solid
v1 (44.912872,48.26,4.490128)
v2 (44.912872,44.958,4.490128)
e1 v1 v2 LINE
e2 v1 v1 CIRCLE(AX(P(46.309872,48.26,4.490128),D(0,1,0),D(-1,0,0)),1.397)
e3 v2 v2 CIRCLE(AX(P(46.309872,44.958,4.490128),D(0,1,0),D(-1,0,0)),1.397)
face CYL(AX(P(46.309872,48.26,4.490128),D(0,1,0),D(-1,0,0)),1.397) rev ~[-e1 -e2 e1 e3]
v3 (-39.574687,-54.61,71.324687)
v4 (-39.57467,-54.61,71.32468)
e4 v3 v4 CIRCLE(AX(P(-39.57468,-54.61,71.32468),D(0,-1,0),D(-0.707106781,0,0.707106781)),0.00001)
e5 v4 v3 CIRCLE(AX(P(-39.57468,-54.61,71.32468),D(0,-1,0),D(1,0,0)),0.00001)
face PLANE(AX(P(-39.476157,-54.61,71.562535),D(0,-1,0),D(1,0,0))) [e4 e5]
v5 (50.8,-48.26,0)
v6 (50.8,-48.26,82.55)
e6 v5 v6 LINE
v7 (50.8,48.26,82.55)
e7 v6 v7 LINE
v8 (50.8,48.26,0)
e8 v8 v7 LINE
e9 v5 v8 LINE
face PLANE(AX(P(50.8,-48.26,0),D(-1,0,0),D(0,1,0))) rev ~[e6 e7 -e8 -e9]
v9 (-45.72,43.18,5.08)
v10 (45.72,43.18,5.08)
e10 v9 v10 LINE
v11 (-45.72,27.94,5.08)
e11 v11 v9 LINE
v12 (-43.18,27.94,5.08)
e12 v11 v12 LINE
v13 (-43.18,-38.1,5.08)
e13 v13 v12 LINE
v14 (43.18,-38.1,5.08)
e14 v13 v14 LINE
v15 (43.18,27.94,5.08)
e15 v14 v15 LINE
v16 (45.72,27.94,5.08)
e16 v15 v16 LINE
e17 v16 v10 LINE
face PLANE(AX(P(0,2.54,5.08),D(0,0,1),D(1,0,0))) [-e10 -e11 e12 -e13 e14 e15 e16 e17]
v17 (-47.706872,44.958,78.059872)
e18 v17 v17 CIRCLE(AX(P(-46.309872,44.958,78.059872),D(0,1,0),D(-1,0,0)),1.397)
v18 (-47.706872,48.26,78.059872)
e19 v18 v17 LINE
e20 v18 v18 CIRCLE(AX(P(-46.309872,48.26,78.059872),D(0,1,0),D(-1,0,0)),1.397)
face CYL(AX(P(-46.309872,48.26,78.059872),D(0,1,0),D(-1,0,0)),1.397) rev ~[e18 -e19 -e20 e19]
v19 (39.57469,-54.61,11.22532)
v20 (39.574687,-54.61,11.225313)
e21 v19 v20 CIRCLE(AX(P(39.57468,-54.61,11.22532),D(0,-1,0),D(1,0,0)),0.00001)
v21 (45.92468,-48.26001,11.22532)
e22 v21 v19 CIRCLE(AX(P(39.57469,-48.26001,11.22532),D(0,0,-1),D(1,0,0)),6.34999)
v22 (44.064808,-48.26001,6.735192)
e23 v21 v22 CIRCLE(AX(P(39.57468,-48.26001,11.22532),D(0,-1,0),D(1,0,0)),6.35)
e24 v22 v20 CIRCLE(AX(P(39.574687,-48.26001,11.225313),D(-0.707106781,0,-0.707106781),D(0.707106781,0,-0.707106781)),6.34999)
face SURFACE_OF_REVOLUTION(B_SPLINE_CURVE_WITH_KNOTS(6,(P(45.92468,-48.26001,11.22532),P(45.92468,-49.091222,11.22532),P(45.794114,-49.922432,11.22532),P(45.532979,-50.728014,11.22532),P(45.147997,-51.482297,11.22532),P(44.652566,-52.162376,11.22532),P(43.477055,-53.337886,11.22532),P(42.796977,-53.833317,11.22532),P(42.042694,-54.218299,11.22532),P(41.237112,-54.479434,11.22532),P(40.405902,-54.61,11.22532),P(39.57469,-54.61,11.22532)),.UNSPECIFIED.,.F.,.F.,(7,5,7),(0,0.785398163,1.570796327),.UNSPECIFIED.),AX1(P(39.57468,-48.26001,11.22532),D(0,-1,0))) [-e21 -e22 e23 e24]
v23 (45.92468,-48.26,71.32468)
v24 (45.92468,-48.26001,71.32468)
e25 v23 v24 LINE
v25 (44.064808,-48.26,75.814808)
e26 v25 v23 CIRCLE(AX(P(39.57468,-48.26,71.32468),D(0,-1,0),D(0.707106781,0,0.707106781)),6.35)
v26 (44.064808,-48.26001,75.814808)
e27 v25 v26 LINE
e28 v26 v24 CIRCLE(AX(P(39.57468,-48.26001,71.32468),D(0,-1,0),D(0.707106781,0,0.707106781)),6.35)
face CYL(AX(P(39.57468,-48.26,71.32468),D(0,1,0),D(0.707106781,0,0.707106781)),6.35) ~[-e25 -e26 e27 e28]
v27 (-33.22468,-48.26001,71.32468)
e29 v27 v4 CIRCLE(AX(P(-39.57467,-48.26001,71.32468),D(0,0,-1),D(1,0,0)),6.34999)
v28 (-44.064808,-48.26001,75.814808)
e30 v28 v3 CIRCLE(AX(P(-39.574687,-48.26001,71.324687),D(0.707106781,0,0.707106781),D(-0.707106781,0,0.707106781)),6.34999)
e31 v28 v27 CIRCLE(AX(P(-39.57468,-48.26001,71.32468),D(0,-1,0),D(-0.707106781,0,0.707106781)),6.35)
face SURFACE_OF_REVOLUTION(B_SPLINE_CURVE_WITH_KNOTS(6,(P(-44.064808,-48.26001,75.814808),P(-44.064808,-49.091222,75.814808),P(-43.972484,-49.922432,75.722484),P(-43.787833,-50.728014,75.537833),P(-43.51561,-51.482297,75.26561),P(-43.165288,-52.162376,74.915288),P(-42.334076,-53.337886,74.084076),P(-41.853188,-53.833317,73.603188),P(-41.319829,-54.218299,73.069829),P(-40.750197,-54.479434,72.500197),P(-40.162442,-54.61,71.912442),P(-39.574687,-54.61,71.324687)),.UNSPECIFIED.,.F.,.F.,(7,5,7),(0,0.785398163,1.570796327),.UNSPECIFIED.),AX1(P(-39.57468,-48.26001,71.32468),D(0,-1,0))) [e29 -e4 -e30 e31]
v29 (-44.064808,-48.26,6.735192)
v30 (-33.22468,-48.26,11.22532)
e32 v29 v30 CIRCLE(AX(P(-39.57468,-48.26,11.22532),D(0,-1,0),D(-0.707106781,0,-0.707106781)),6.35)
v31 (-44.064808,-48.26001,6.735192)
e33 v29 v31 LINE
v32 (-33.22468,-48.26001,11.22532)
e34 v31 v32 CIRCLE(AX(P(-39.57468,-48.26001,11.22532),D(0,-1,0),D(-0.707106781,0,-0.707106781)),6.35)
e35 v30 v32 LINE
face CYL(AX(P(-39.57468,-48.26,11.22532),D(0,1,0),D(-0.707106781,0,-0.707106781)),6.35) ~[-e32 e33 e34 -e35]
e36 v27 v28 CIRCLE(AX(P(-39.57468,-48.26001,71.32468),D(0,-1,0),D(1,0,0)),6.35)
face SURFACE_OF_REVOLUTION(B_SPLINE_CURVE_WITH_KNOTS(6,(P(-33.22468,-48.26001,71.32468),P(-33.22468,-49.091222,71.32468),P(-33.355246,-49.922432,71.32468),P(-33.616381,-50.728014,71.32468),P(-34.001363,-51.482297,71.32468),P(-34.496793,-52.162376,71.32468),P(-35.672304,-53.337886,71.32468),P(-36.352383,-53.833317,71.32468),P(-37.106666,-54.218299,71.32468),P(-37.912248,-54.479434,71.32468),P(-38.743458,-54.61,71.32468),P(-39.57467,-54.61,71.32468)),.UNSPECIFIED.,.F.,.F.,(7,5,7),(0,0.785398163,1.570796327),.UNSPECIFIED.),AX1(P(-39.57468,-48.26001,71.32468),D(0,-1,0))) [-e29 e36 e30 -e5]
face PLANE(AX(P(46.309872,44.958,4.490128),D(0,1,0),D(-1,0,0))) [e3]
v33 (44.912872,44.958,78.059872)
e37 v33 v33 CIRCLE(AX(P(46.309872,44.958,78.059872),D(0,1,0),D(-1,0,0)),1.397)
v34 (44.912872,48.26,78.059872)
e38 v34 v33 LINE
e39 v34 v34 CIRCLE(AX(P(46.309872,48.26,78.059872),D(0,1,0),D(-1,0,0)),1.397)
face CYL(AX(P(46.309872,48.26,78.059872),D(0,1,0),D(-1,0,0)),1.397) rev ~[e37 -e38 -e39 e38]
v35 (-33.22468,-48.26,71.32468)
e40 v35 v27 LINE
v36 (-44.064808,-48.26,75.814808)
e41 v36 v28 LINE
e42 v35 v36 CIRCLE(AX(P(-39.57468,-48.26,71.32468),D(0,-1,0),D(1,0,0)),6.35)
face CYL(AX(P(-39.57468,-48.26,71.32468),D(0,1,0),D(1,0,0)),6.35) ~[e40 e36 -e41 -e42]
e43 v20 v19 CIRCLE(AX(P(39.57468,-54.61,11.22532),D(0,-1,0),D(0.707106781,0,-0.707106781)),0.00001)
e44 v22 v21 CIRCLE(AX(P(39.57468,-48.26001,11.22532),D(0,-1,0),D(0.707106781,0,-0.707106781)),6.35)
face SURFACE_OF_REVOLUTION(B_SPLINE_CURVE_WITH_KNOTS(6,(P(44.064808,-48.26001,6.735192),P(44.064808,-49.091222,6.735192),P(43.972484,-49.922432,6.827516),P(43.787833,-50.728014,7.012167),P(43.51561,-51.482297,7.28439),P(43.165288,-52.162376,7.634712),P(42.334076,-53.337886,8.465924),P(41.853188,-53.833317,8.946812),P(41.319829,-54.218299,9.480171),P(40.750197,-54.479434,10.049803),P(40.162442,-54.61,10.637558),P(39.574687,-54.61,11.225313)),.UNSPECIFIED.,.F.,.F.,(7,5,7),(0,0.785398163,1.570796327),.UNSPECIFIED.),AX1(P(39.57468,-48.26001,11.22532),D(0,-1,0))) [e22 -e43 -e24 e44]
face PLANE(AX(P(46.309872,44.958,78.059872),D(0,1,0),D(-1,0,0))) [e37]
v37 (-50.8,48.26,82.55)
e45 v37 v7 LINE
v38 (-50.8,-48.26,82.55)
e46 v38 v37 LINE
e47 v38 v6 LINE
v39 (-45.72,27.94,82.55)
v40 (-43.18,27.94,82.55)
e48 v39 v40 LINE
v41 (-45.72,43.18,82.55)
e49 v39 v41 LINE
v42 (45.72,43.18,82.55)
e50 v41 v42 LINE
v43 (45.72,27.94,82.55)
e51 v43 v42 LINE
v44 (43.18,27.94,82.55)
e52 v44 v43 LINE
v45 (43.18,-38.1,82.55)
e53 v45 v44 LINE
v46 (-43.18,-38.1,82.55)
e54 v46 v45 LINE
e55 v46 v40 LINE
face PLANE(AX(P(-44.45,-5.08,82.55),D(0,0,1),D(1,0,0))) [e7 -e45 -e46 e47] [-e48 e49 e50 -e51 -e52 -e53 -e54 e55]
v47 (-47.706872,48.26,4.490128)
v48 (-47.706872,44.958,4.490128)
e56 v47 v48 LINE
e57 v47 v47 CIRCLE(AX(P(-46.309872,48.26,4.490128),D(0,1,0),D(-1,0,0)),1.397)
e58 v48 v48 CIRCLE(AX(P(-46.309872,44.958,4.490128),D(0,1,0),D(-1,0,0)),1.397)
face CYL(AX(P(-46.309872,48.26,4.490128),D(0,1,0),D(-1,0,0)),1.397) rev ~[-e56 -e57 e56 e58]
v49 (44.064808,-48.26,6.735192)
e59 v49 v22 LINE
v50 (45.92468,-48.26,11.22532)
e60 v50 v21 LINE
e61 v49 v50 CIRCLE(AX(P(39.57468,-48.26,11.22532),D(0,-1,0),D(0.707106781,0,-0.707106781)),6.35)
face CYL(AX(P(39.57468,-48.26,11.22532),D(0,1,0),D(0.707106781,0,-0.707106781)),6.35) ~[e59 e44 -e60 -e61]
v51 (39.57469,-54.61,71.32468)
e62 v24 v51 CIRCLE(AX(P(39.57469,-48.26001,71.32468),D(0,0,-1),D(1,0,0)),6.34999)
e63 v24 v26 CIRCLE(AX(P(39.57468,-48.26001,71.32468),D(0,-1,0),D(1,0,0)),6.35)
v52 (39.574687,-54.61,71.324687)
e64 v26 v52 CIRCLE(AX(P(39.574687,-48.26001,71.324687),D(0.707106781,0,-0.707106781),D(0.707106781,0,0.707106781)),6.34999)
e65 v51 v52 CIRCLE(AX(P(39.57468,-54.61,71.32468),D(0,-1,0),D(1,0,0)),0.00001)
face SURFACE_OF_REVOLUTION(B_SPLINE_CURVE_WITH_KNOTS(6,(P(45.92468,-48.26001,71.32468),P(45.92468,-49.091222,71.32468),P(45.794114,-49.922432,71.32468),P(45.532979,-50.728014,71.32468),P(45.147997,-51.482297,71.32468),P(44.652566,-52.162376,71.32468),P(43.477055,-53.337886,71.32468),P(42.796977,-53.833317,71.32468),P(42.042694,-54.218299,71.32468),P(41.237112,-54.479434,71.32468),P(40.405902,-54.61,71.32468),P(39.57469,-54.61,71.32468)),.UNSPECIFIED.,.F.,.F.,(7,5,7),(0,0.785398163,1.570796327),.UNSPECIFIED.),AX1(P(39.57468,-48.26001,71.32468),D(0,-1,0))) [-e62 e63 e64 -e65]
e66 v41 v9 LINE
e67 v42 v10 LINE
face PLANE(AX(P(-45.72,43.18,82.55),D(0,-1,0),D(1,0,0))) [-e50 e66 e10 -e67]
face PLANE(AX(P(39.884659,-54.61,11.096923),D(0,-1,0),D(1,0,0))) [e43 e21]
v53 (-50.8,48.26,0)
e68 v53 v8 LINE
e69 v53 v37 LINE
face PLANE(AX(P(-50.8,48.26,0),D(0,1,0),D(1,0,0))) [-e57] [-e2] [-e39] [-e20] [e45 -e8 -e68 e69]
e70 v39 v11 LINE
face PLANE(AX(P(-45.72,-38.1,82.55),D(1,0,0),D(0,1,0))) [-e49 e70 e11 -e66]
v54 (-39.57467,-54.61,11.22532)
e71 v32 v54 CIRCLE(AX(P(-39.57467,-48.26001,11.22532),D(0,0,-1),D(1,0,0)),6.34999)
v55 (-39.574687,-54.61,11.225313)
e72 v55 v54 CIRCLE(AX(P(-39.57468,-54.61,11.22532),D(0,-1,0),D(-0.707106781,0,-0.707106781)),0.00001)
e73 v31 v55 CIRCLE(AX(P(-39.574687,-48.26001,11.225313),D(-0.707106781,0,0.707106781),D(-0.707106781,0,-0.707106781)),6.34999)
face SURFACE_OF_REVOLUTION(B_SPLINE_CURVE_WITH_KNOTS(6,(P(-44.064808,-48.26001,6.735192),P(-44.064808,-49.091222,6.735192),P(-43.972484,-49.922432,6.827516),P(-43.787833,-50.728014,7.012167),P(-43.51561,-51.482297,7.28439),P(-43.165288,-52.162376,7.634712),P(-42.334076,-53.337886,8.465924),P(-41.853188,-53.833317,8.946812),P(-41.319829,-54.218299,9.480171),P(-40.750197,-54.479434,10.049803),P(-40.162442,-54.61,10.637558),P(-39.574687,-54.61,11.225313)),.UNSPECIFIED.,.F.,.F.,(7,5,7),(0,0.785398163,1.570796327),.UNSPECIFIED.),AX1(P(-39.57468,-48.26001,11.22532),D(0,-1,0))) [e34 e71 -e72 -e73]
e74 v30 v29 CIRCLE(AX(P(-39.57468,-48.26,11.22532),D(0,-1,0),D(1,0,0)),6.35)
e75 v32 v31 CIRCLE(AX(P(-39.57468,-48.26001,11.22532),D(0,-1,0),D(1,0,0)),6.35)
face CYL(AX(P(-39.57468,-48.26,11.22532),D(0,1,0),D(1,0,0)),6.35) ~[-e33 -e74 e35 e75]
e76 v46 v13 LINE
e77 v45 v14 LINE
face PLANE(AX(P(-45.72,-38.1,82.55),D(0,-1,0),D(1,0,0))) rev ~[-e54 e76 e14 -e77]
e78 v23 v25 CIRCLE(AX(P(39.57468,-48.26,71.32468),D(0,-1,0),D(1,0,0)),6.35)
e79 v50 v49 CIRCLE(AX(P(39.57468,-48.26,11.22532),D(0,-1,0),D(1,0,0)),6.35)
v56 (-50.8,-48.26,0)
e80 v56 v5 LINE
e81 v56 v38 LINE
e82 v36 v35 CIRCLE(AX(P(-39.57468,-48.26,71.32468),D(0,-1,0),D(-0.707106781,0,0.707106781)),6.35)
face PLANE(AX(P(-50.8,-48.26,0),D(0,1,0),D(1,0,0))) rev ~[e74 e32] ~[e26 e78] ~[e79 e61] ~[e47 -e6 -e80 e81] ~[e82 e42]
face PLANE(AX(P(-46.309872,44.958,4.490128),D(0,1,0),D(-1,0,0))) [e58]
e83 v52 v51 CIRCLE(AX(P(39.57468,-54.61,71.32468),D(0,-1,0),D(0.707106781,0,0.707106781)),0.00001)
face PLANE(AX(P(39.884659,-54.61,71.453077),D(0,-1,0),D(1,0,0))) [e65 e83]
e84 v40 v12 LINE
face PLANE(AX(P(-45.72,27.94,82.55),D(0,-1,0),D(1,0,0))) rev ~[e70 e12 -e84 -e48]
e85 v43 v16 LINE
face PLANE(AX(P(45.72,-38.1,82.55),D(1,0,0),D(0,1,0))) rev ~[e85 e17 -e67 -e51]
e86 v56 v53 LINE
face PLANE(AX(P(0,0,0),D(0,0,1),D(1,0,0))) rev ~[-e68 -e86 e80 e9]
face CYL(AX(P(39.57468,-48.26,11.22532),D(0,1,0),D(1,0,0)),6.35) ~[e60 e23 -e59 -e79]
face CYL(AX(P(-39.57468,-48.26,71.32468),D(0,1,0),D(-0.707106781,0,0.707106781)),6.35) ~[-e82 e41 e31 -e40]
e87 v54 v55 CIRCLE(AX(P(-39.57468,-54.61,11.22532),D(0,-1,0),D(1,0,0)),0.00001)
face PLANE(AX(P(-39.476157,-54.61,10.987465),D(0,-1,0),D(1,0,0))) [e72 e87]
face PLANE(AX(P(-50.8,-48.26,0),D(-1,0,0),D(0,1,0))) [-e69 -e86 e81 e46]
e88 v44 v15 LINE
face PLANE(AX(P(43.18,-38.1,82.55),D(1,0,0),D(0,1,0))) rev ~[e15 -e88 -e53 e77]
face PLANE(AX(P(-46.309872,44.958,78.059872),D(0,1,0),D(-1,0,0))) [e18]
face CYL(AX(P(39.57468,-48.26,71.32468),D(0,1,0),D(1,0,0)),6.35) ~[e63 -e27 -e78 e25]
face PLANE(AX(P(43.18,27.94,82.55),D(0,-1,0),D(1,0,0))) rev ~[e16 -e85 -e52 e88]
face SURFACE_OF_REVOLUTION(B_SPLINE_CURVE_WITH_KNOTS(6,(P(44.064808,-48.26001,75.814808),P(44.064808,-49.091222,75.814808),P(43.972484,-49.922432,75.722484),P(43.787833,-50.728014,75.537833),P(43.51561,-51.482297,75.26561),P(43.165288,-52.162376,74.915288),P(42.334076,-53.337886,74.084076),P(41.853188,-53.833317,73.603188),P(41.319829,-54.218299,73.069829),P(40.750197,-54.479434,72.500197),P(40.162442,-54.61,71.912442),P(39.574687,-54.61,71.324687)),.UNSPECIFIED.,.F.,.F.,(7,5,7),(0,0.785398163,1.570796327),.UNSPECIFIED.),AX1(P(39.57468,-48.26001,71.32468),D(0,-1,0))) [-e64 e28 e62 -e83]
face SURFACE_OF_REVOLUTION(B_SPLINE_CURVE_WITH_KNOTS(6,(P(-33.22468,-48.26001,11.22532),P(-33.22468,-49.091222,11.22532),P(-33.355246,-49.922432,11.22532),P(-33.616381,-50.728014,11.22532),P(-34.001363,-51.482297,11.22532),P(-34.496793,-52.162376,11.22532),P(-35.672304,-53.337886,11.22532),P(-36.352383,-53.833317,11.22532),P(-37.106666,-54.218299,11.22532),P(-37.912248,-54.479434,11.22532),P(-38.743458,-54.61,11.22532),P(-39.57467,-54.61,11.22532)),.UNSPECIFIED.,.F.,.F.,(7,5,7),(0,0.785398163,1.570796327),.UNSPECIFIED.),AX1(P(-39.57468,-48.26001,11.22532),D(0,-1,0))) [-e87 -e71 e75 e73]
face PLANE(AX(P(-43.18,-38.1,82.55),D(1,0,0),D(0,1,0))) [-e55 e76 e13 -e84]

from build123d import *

# Parameters (mm, degrees)
F0_W     = 101.6
F0_H     = 96.52
F1_DEPTH = 82.55
F2_W     = 91.44
F2_H     = 81.28
F3_DEPTH = 77.47
F4_W     = 2.54
F4_H     = 66.04
F5_DEPTH = 81.28
F6_R     = 1.397
F7_DEPTH = 3.302
F9_DEPTH = 6.35
F10_R    = 6.34999


# Not quite as in the source:
# - a fillet or chamfer is up to 0.001 mm smaller than in the source, because OpenCascade refuses the exact size


with BuildPart() as f1:
    # F0 (on Top) → F1 (new body)
    with BuildSketch(Plane.XY):
        Rectangle(F0_W, F0_H)
    extrude(amount=F1_DEPTH)

    # F2 (on face) → F3 (cut)
    with BuildSketch(Plane.XY.offset(82.55)):
        with Locations((0, 2.54)):
            Rectangle(F2_W, F2_H)
    extrude(amount=-F3_DEPTH, mode=Mode.SUBTRACT)

    # F4 (on face) → F5 (join)
    with BuildSketch(Plane.XY.offset(82.55)):
        with Locations((-44.45, -5.08)):
            Rectangle(F4_W, F4_H)
        with Locations((44.45, -5.08)):
            Rectangle(F4_W, F4_H)
    extrude(amount=-F5_DEPTH)

    # F6 (on face) → F7 (cut)
    with BuildSketch(Plane(origin=(0, 48.26, 0), x_dir=(-1, 0, 0), z_dir=(0, 1, 0))):
        with Locations((-46.3098719395, 78.0598719395)):
            Circle(F6_R)
        with Locations((46.3098719395, 78.0598719395)):
            Circle(F6_R)
        with Locations((46.3098719395, 4.4901280605)):
            Circle(F6_R)
        with Locations((-46.3098719395, 4.4901280605)):
            Circle(F6_R)
    extrude(amount=-F7_DEPTH, mode=Mode.SUBTRACT)

    # F8 (on face) → F9 (join)
    with BuildSketch(Plane.XZ.offset(48.26)):
        with BuildLine():
            ThreePointArc((-44.0648079092, 75.8148079092), (-42.0047196442, 65.4580448172), (-33.2246798487, 71.3246798487))
            ThreePointArc((-33.2246798487, 71.3246798487), (-37.1446400531, 77.1913148801), (-44.0648079092, 75.8148079092))
        make_face()
        with BuildLine():
            ThreePointArc((44.0648079092, 75.8148079092), (33.7080448172, 68.8946400531), (45.9246798487, 71.3246798487))
            ThreePointArc((45.9246798487, 71.3246798487), (45.4413148801, 73.7547196442), (44.0648079092, 75.8148079092))
        make_face()
        with BuildLine():
            ThreePointArc((44.0648079092, 6.7351920908), (45.4413148801, 8.7952803558), (45.9246798487, 11.2253201513))
            ThreePointArc((45.9246798487, 11.2253201513), (33.7080448172, 13.6553599469), (44.0648079092, 6.7351920908))
        make_face()
        with BuildLine():
            ThreePointArc((-44.0648079092, 6.7351920908), (-37.1446400531, 5.3586851199), (-33.2246798487, 11.2253201513))
            ThreePointArc((-33.2246798487, 11.2253201513), (-42.0047196442, 17.0919551828), (-44.0648079092, 6.7351920908))
        make_face()
    extrude(amount=F9_DEPTH)

    # F10 (radius 6.35 in the source; OpenCascade refuses exactly that, so slightly less here)
    f10_edges = [f1.edges().sort_by_distance(p)[0] for p in [
        (-45.92468, -54.61, 71.32468),
        (33.22468, -54.61, 71.32468),
        (35.084552, -54.61, 15.715448),
        (-35.084552, -54.61, 15.715448),
    ]]
    fillet(f10_edges, radius=F10_R)


solid = f1.part
